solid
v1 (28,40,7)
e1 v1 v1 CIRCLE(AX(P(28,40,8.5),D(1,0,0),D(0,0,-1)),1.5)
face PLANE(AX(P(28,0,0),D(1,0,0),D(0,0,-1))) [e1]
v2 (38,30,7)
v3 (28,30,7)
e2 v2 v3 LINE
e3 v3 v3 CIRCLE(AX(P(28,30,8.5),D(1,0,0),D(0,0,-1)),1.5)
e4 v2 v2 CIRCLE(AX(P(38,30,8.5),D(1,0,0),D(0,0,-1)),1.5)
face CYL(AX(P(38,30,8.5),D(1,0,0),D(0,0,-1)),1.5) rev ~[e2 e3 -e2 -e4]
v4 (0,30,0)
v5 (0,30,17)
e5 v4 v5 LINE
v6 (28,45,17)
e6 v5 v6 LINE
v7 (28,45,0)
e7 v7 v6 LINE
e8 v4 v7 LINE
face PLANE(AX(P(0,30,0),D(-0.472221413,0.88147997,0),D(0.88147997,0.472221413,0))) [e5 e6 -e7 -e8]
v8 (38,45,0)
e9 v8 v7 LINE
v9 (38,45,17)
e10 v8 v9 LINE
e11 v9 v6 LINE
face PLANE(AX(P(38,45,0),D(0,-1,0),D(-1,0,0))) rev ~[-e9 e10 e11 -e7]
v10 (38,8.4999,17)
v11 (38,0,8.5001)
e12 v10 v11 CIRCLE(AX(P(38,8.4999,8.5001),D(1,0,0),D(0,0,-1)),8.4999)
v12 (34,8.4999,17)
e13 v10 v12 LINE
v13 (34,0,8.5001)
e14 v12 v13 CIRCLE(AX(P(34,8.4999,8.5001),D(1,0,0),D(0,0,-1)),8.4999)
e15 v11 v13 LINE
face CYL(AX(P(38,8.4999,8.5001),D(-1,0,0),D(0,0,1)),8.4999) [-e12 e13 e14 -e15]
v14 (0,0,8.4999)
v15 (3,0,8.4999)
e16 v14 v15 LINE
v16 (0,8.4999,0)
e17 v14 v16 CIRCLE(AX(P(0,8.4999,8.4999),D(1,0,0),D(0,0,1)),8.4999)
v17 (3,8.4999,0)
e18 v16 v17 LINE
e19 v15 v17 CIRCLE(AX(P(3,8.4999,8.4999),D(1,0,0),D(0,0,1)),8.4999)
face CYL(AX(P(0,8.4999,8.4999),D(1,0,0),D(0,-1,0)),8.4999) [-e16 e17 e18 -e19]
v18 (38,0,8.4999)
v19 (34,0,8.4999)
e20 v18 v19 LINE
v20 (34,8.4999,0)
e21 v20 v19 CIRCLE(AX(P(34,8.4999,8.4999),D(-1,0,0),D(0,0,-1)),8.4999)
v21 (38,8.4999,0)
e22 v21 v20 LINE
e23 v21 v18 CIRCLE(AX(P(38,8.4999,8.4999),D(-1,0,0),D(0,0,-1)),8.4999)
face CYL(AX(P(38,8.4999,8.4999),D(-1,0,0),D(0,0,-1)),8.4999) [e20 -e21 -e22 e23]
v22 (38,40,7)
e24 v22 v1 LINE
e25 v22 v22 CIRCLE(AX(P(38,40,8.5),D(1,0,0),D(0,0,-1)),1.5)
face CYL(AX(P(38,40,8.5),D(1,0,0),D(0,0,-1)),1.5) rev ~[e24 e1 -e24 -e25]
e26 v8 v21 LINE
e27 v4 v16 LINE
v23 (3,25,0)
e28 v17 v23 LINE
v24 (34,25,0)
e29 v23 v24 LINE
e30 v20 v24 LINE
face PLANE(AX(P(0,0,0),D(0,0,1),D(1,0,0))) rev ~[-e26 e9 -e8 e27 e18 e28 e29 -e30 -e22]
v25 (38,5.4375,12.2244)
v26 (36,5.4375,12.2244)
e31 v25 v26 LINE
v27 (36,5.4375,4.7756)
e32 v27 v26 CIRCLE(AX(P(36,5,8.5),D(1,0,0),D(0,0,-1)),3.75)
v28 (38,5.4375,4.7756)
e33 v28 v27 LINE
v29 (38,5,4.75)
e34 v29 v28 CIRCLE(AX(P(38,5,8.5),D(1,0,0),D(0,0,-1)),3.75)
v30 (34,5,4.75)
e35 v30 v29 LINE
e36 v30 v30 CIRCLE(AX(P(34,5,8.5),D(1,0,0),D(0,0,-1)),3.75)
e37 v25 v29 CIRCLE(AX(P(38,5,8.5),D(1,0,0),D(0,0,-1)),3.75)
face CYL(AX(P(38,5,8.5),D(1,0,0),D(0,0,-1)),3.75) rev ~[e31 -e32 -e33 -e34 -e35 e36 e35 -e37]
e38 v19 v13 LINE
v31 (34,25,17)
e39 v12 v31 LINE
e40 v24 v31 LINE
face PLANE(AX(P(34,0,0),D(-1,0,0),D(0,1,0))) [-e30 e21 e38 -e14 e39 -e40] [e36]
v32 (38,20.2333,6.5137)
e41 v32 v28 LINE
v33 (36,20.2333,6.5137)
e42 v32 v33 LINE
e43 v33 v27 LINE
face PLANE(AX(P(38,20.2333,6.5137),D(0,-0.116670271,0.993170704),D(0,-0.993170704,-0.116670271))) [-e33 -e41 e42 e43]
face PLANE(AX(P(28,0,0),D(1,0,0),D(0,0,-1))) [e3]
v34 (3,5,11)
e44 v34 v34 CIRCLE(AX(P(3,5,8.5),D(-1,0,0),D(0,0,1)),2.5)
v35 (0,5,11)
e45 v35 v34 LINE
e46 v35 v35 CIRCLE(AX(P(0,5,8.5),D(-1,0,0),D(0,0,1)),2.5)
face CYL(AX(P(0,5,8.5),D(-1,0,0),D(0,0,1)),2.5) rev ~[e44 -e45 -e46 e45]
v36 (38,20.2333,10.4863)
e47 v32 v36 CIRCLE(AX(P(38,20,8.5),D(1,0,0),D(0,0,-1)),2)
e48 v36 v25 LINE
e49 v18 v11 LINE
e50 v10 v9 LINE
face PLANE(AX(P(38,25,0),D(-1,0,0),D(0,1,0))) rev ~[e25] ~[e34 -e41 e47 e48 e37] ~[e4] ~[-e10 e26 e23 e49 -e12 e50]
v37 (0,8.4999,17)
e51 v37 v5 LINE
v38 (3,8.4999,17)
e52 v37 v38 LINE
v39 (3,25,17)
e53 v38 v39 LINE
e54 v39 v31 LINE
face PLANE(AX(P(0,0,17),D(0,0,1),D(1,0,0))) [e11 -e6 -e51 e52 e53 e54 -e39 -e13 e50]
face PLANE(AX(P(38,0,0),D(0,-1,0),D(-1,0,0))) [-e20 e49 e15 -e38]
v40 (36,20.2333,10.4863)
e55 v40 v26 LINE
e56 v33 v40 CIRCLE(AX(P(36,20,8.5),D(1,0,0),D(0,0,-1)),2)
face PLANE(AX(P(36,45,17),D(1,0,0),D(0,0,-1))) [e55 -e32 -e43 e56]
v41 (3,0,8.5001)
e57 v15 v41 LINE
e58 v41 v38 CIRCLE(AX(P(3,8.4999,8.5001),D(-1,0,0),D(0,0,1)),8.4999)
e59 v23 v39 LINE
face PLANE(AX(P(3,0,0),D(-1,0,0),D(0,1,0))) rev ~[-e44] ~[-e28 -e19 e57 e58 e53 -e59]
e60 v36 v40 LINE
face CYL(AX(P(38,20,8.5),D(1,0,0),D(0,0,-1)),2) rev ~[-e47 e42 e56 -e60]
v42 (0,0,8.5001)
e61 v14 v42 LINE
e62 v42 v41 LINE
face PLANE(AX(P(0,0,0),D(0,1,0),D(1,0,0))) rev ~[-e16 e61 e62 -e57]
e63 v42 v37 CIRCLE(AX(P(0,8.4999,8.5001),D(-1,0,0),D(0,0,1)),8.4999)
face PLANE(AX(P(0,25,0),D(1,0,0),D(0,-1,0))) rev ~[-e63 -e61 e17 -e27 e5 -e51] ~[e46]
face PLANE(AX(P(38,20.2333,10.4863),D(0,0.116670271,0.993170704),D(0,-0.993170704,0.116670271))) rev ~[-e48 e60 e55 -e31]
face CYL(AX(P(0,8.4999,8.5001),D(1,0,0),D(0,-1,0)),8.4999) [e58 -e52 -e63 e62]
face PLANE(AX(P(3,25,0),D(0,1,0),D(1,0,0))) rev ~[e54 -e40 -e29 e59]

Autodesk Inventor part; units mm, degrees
ref_plane "YZ Plane" through (0, 0, 0) normal (1, 0, 0) x (0, 1, 0)
ref_plane "XZ Plane" through (0, 0, 0) normal (0, 1, 0) x (-1, 0, 0)
ref_plane "XY Plane" through (0, 0, 0) normal (0, 0, 1) x (1, 0, 0)
sketch "Sketch1" plane through (0, 0, 0) normal (0, 0, 1) x (1, 0, 0)
  line L0 (0, 0) -> (3, 0)
  line L1 (3, 0) -> (3, 25)
  line L2 (3, 25) -> (0, 25)
  line L3 (0, 25) -> (0, 0)
  line L4 (34, 25) -> (38, 25)
  line L5 (38, 25) -> (38, 0)
  line L6 (38, 0) -> (34, 0)
  line L7 (34, 0) -> (34, 25)
  line L8 (0, 25) -> (38, 25)
  line L9 (38, 25) -> (38, 45)
  line L10 (38, 45) -> (0, 45)
  line L11 (0, 45) -> (0, 25)
  line L12 (0, 25) -> (0, 30)
  line L13 (0, 30) -> (28, 45)
  line L14 (28, 45) -> (38, 45)
  point P0 (34, 25)
  dimension "d0" = 3
  dimension "d1" = 25
  dimension "d2" = 4
  dimension "d3" = 25
  dimension "d4" = 31
  dimension "d5" = 38
  dimension "d6" = 20
  dimension "d7" = 5
  dimension "d10" = 10
extrude "Extrusion1" add sketch "Sketch1" along normal blind 17 contours L3 L2 L1 L0 | L11 L13 L10 L9 L4 L8 L2 | L4 L5 L6 L7
sketch "Sketch2" plane through (38, 0, 0) normal (1, 0, 0) x (0, 0, -1)
  line L0 (0, 25) -> (-17, 25) projected
  line L1 (0, 0) -> (0, 45) projected
  line L2 (-17, 25) -> (0, 25)
  line L3 (0, 25) -> (0, 45)
  line L4 (0, 45) -> (-17, 45)
  line L5 (-17, 45) -> (-17, 25)
  circle A0 centre (-8.5, 30) radius 1.5
  circle A1 centre (-8.5, 40) radius 1.5
  dimension "d11" = 3
  dimension "d12" = 3
  dimension "d13" = 5
  dimension "d15" = 8.5
  dimension "d16" = 5
  dimension "d19" = 17
  dimension "d20" = 8.5
  dimension "d21" = 20
extrude "Extrusion2" cut sketch "Sketch2" against normal blind 10 contours A0 | A1
sketch "Sketch3" plane through (38, 0, 0) normal (1, 0, 0) x (0, 0, -1)
  circle A0 centre (-8.5, 5) radius 3.75
  line L0 (0, 0) -> (-17, 0) projected
  line L1 (0, 0) -> (0, 45) projected
  point P0 (-8.5, 0)
  dimension "d22" = 7.5
  dimension "d23" = 5
  dimension "d24" = 8.5
extrude "Extrusion3" cut sketch "Sketch3" against normal up to surface (4 mm away)
fillet "Fillet1" radius 8.5 4 edges at (36, 0, 17) (1.5, 0, 17) (1.5, 0, 0) (36, 0, 0)
sketch "Sketch4" plane through (0, 30, 0) normal (-1, 0, 0) x (0, 0, 1)
  circle A0 centre (8.5, -25) radius 2.5
  arc A1 (0, -21.5) -> (17, -21.5) centre (8.5, -21.5) ccw projected
  line L0 (17, 0) -> (17, -21.5) projected
  point P0 (0, -30)
  point P1 (8.5, -30)
  dimension "d28" = 5
  dimension "d29" = 5
  dimension "d30" = 8.5
extrude "Extrusion4" cut sketch "Sketch4" against normal up to surface (3 mm away)
sketch "Sketch5" plane through (38, 45, 17) normal (1, 0, 0) x (0, 0, -1)
  circle A0 centre (8.5, -40) radius 3.75 projected
  circle A1 centre (8.5, -40) radius 3.5
  circle A2 centre (8.5, -25) radius 2
  circle A3 centre (8.5, -40) radius 3.75
  line L0 (10.4863, -24.7667) -> (12.2244, -39.5625)
  line L1 (6.5137, -24.7667) -> (4.7756, -39.5625)
  point P0 (17, -45)
  dimension "d33" = 4
  dimension "d34" = 15
  dimension "d35" = 0
extrude "Extrusion5" cut sketch "Sketch5" against normal blind 2 contours A0 | A0 L1 A2 L0 | A2 | A1
properties part number "juncao6"
